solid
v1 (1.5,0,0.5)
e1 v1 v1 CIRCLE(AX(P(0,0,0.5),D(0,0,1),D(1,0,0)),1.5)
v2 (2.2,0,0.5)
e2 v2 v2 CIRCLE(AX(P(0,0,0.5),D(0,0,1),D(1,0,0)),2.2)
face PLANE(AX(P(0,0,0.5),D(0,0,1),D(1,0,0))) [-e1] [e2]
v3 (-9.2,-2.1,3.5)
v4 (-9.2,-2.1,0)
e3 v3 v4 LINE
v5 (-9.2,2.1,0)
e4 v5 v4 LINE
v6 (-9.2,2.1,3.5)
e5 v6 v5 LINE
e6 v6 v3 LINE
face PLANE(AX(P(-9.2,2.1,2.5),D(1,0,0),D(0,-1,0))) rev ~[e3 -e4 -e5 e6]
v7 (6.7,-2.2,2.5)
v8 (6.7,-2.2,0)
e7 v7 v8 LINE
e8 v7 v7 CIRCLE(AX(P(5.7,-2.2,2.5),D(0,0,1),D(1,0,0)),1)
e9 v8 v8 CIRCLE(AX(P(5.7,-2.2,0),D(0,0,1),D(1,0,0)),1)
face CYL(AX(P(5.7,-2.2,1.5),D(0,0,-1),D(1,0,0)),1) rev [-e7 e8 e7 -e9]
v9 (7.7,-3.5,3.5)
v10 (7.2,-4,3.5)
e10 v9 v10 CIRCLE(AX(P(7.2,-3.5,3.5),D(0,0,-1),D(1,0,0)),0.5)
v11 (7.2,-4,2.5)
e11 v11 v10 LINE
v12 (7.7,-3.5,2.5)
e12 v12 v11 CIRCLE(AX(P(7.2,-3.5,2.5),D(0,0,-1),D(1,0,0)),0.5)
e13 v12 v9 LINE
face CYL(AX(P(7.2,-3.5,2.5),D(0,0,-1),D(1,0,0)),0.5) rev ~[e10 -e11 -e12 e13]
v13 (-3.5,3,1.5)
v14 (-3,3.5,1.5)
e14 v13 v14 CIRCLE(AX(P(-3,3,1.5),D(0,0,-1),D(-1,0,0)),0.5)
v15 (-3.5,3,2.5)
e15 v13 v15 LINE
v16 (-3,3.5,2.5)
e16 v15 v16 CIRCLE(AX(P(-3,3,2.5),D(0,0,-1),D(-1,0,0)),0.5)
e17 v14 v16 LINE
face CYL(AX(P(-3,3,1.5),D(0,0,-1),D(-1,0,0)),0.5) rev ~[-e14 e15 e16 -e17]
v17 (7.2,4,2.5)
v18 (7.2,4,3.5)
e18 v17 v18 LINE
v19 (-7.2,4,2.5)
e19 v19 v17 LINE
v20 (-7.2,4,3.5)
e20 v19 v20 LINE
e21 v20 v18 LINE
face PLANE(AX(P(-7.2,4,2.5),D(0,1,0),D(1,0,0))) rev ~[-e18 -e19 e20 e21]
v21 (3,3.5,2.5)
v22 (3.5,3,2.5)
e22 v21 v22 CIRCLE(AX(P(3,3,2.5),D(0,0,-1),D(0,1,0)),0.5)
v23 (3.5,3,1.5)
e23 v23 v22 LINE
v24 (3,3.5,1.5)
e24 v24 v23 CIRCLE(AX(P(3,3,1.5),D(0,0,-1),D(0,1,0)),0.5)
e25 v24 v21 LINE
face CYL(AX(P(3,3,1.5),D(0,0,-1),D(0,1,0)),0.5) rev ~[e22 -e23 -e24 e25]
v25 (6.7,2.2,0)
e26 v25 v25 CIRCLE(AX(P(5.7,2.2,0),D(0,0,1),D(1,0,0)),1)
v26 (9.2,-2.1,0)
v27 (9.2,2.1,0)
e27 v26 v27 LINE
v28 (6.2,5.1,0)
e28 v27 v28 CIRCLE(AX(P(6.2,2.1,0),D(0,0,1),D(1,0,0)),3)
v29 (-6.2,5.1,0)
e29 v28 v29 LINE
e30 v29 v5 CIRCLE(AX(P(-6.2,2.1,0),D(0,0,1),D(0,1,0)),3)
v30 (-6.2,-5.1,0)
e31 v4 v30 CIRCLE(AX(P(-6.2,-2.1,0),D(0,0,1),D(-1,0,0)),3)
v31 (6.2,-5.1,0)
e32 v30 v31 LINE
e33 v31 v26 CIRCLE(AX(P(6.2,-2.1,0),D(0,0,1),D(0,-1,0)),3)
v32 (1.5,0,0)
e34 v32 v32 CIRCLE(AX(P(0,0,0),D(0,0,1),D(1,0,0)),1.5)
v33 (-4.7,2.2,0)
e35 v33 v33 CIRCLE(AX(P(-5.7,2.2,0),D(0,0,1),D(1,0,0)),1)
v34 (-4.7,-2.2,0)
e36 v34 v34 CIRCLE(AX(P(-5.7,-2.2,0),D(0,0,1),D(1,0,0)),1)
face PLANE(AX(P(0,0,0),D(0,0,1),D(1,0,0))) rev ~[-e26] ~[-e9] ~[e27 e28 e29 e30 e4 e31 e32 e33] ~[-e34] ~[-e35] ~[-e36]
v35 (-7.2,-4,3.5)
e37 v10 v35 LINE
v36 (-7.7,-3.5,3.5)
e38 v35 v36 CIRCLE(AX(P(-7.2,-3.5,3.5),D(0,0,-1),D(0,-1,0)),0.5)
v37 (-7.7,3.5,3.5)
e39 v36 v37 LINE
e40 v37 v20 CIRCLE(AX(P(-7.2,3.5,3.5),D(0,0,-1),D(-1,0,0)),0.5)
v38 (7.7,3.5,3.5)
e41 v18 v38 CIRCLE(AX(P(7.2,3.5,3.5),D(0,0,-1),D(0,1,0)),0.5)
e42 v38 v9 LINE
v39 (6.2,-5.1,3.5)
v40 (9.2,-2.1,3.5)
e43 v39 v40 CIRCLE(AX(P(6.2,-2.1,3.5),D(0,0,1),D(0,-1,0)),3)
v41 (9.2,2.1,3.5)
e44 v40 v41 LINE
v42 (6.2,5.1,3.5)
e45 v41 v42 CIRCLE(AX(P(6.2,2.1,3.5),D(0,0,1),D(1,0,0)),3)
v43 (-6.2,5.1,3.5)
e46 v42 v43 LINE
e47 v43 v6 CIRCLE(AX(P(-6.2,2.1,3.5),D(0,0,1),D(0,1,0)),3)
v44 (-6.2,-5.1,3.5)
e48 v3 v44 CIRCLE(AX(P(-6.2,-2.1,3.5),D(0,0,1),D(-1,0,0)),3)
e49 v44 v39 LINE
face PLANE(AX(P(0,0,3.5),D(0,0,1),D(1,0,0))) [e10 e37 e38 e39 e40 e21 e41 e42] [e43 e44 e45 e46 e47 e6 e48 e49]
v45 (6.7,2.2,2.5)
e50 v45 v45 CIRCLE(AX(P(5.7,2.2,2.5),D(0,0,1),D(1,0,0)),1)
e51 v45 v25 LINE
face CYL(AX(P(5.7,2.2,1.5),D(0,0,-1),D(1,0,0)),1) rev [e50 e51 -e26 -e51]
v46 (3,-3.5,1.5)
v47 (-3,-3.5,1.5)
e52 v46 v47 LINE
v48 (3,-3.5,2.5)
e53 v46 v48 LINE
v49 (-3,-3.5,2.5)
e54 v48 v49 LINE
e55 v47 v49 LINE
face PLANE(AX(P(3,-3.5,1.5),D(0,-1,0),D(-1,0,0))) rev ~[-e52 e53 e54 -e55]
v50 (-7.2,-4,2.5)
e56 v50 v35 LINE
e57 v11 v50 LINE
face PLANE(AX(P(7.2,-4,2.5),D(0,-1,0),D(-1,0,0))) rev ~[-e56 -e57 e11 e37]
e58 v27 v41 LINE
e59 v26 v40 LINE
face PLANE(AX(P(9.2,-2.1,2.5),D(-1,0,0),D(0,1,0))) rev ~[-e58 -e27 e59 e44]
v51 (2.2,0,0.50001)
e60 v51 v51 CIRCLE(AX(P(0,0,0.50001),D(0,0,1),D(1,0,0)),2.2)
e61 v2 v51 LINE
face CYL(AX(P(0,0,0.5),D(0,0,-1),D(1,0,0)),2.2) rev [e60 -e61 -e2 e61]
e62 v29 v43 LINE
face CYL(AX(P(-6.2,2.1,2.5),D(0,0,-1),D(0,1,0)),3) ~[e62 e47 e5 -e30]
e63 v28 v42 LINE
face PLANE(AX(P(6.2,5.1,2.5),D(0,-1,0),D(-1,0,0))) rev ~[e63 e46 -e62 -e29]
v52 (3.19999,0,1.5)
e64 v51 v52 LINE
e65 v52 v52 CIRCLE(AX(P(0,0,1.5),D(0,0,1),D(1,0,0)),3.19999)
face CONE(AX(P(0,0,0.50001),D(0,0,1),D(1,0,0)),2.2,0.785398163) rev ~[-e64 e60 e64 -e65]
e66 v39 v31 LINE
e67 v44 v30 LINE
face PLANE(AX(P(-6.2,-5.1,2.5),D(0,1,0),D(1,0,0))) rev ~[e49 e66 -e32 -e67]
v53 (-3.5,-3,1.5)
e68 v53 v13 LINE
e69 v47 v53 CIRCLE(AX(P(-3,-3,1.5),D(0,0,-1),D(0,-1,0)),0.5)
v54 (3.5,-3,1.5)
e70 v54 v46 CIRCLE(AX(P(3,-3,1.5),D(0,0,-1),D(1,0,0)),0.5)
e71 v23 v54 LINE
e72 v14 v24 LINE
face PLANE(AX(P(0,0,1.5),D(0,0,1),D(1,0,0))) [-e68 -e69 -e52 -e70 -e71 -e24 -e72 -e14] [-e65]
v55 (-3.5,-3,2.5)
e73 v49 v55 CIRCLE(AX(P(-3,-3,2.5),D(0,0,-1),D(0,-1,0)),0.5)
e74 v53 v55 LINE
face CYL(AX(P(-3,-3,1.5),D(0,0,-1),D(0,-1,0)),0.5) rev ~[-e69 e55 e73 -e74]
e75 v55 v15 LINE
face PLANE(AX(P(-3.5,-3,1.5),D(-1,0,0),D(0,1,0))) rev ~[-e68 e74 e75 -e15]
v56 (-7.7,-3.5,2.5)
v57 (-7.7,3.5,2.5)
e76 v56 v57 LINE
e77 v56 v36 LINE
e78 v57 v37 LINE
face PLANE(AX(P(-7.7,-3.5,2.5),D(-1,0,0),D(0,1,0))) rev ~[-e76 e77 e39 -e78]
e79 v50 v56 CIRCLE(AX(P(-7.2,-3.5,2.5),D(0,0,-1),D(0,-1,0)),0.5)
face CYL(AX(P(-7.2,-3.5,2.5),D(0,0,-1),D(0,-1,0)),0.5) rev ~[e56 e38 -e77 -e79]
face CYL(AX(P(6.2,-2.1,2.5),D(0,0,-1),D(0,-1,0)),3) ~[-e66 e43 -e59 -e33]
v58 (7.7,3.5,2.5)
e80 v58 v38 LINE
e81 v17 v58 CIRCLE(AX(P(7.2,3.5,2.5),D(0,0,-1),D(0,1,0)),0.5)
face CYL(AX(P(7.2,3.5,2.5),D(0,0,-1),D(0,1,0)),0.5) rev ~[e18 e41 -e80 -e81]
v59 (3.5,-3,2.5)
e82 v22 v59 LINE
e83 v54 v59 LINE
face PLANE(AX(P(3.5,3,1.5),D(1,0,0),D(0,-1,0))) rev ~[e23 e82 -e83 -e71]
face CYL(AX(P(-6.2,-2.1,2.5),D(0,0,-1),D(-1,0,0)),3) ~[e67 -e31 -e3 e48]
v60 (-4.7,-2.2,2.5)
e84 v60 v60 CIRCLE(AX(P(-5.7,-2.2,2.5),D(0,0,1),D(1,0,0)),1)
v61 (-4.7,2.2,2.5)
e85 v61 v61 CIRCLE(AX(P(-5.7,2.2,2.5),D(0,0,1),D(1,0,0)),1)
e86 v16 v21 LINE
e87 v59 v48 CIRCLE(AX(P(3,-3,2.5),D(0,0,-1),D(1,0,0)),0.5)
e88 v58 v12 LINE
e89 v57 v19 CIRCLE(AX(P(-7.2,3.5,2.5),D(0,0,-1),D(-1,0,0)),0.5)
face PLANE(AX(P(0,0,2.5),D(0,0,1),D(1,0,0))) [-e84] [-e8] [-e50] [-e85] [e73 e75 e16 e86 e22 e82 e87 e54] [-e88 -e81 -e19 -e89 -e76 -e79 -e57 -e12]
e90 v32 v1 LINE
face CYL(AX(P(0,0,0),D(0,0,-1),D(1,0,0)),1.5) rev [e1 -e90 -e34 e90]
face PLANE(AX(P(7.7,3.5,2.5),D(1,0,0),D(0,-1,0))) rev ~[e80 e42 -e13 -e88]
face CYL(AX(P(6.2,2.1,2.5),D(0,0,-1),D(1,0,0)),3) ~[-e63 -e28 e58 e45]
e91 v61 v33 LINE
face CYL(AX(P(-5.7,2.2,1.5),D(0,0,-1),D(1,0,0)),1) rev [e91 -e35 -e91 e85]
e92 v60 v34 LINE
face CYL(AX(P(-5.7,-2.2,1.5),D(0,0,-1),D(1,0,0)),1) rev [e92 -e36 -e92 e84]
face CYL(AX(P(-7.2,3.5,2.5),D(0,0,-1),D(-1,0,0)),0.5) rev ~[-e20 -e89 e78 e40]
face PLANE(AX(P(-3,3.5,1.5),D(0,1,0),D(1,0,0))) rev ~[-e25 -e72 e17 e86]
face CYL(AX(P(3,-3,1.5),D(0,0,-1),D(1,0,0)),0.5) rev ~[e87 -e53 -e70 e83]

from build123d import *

# Parameters (mm, degrees)
F0_R     = 1
F0_R_2   = 1.5
F1_DEPTH = 0.5
F2_R     = 1
F2_R_2   = 2.2
F3_DEPTH = 1
F4_SIZE  = 0.99999
F5_R     = 1
F6_DEPTH = 1
F8_DEPTH = 1


# Not quite as in the source:
# - a fillet or chamfer is up to 0.001 mm smaller than in the source, because OpenCascade refuses the exact size


with BuildPart() as f1:
    # F0 (on Top) → F1 (new body)
    with BuildSketch(Plane.XY):
        with BuildLine():
            Line((-6.2, -5.1), (6.2, -5.1))
            ThreePointArc((6.2, -5.1), (8.3213203436, -4.2213203436), (9.2, -2.1))
            Line((9.2, -2.1), (9.2, 2.1))
            ThreePointArc((9.2, 2.1), (8.3213203436, 4.2213203436), (6.2, 5.1))
            Line((6.2, 5.1), (-6.2, 5.1))
            ThreePointArc((-6.2, 5.1), (-8.3213203436, 4.2213203436), (-9.2, 2.1))
            Line((-9.2, 2.1), (-9.2, -2.1))
            ThreePointArc((-9.2, -2.1), (-8.3213203436, -4.2213203436), (-6.2, -5.1))
        make_face()
        with Locations((-5.7, -2.2)):
            Circle(F0_R, mode=Mode.SUBTRACT)
        with Locations((5.7, -2.2)):
            Circle(F0_R, mode=Mode.SUBTRACT)
        with Locations((-5.7, 2.2)):
            Circle(F0_R, mode=Mode.SUBTRACT)
        Circle(F0_R_2, mode=Mode.SUBTRACT)
        with Locations((5.7, 2.2)):
            Circle(F0_R, mode=Mode.SUBTRACT)
    extrude(amount=F1_DEPTH)

    # F2 (on face) → F3 (join)
    with BuildSketch(Plane.XY.offset(0.5)):
        with BuildLine():
            ThreePointArc((-6.2, 5.1), (-8.3213203436, 4.2213203436), (-9.2, 2.1))
            Line((-9.2, 2.1), (-9.2, -2.1))
            ThreePointArc((-9.2, -2.1), (-8.3213203436, -4.2213203436), (-6.2, -5.1))
            Line((-6.2, -5.1), (6.2, -5.1))
            ThreePointArc((6.2, -5.1), (8.3213203436, -4.2213203436), (9.2, -2.1))
            Line((9.2, -2.1), (9.2, 2.1))
            ThreePointArc((9.2, 2.1), (8.3213203436, 4.2213203436), (6.2, 5.1))
            Line((6.2, 5.1), (-6.2, 5.1))
        make_face()
        with Locations((-5.7, -2.2)):
            Circle(F2_R, mode=Mode.SUBTRACT)
        Circle(F2_R_2, mode=Mode.SUBTRACT)
        with Locations((5.7, -2.2)):
            Circle(F2_R, mode=Mode.SUBTRACT)
        with Locations((-5.7, 2.2)):
            Circle(F2_R, mode=Mode.SUBTRACT)
        with Locations((5.7, 2.2)):
            Circle(F2_R, mode=Mode.SUBTRACT)
    extrude(amount=F3_DEPTH)

    # F4 (size 1 in the source; OpenCascade refuses exactly that, so slightly less here)
    f4_edges = [f1.edges().sort_by_distance(p)[0] for p in [
        (-2.2, 0, 1.5),
    ]]
    chamfer(f4_edges, length=F4_SIZE)

    # F5 (on face) → F6 (join)
    with BuildSketch(Plane.XY.offset(1.5)):
        with BuildLine():
            Line((6.2, 5.1), (-6.2, 5.1))
            ThreePointArc((-6.2, 5.1), (-8.3213203436, 4.2213203436), (-9.2, 2.1))
            Line((-9.2, 2.1), (-9.2, -2.1))
            ThreePointArc((-9.2, -2.1), (-8.3213203436, -4.2213203436), (-6.2, -5.1))
            Line((-6.2, -5.1), (6.2, -5.1))
            ThreePointArc((6.2, -5.1), (8.3213203436, -4.2213203436), (9.2, -2.1))
            Line((9.2, -2.1), (9.2, 2.1))
            ThreePointArc((9.2, 2.1), (8.3213203436, 4.2213203436), (6.2, 5.1))
        make_face()
        with Locations((-5.7, -2.2)):
            Circle(F5_R, mode=Mode.SUBTRACT)
        with BuildLine():
            ThreePointArc((3.5, -3), (3.3535533906, -3.3535533906), (3, -3.5))
            Line((3, -3.5), (-3, -3.5))
            ThreePointArc((-3, -3.5), (-3.3535533906, -3.3535533906), (-3.5, -3))
            Line((-3.5, -3), (-3.5, 3))
            ThreePointArc((-3.5, 3), (-3.3535533906, 3.3535533906), (-3, 3.5))
            Line((-3, 3.5), (3, 3.5))
            ThreePointArc((3, 3.5), (3.3535533906, 3.3535533906), (3.5, 3))
            Line((3.5, 3), (3.5, -3))
        make_face(mode=Mode.SUBTRACT)
        with Locations((5.7, -2.2)):
            Circle(F5_R, mode=Mode.SUBTRACT)
        with Locations((-5.7, 2.2)):
            Circle(F5_R, mode=Mode.SUBTRACT)
        with Locations((5.7, 2.2)):
            Circle(F5_R, mode=Mode.SUBTRACT)
    extrude(amount=F6_DEPTH)

    # F7 (on face) → F8 (join)
    with BuildSketch(Plane.XY.offset(2.5)):
        with BuildLine():
            ThreePointArc((6.2, -5.1), (8.3213203436, -4.2213203436), (9.2, -2.1))
            Line((9.2, -2.1), (9.2, 2.1))
            ThreePointArc((9.2, 2.1), (8.3213203436, 4.2213203436), (6.2, 5.1))
            Line((6.2, 5.1), (-6.2, 5.1))
            ThreePointArc((-6.2, 5.1), (-8.3213203436, 4.2213203436), (-9.2, 2.1))
            Line((-9.2, 2.1), (-9.2, -2.1))
            ThreePointArc((-9.2, -2.1), (-8.3213203436, -4.2213203436), (-6.2, -5.1))
            Line((-6.2, -5.1), (6.2, -5.1))
        make_face()
        with BuildLine():
            ThreePointArc((7.7, -3.5), (7.5535533906, -3.8535533906), (7.2, -4))
            Line((7.2, -4), (-7.2, -4))
            ThreePointArc((-7.2, -4), (-7.5535533906, -3.8535533906), (-7.7, -3.5))
            Line((-7.7, -3.5), (-7.7, 3.5))
            ThreePointArc((-7.7, 3.5), (-7.5535533906, 3.8535533906), (-7.2, 4))
            Line((-7.2, 4), (7.2, 4))
            ThreePointArc((7.2, 4), (7.5535533906, 3.8535533906), (7.7, 3.5))
            Line((7.7, 3.5), (7.7, -3.5))
        make_face(mode=Mode.SUBTRACT)
    extrude(amount=F8_DEPTH)


solid = f1.part
